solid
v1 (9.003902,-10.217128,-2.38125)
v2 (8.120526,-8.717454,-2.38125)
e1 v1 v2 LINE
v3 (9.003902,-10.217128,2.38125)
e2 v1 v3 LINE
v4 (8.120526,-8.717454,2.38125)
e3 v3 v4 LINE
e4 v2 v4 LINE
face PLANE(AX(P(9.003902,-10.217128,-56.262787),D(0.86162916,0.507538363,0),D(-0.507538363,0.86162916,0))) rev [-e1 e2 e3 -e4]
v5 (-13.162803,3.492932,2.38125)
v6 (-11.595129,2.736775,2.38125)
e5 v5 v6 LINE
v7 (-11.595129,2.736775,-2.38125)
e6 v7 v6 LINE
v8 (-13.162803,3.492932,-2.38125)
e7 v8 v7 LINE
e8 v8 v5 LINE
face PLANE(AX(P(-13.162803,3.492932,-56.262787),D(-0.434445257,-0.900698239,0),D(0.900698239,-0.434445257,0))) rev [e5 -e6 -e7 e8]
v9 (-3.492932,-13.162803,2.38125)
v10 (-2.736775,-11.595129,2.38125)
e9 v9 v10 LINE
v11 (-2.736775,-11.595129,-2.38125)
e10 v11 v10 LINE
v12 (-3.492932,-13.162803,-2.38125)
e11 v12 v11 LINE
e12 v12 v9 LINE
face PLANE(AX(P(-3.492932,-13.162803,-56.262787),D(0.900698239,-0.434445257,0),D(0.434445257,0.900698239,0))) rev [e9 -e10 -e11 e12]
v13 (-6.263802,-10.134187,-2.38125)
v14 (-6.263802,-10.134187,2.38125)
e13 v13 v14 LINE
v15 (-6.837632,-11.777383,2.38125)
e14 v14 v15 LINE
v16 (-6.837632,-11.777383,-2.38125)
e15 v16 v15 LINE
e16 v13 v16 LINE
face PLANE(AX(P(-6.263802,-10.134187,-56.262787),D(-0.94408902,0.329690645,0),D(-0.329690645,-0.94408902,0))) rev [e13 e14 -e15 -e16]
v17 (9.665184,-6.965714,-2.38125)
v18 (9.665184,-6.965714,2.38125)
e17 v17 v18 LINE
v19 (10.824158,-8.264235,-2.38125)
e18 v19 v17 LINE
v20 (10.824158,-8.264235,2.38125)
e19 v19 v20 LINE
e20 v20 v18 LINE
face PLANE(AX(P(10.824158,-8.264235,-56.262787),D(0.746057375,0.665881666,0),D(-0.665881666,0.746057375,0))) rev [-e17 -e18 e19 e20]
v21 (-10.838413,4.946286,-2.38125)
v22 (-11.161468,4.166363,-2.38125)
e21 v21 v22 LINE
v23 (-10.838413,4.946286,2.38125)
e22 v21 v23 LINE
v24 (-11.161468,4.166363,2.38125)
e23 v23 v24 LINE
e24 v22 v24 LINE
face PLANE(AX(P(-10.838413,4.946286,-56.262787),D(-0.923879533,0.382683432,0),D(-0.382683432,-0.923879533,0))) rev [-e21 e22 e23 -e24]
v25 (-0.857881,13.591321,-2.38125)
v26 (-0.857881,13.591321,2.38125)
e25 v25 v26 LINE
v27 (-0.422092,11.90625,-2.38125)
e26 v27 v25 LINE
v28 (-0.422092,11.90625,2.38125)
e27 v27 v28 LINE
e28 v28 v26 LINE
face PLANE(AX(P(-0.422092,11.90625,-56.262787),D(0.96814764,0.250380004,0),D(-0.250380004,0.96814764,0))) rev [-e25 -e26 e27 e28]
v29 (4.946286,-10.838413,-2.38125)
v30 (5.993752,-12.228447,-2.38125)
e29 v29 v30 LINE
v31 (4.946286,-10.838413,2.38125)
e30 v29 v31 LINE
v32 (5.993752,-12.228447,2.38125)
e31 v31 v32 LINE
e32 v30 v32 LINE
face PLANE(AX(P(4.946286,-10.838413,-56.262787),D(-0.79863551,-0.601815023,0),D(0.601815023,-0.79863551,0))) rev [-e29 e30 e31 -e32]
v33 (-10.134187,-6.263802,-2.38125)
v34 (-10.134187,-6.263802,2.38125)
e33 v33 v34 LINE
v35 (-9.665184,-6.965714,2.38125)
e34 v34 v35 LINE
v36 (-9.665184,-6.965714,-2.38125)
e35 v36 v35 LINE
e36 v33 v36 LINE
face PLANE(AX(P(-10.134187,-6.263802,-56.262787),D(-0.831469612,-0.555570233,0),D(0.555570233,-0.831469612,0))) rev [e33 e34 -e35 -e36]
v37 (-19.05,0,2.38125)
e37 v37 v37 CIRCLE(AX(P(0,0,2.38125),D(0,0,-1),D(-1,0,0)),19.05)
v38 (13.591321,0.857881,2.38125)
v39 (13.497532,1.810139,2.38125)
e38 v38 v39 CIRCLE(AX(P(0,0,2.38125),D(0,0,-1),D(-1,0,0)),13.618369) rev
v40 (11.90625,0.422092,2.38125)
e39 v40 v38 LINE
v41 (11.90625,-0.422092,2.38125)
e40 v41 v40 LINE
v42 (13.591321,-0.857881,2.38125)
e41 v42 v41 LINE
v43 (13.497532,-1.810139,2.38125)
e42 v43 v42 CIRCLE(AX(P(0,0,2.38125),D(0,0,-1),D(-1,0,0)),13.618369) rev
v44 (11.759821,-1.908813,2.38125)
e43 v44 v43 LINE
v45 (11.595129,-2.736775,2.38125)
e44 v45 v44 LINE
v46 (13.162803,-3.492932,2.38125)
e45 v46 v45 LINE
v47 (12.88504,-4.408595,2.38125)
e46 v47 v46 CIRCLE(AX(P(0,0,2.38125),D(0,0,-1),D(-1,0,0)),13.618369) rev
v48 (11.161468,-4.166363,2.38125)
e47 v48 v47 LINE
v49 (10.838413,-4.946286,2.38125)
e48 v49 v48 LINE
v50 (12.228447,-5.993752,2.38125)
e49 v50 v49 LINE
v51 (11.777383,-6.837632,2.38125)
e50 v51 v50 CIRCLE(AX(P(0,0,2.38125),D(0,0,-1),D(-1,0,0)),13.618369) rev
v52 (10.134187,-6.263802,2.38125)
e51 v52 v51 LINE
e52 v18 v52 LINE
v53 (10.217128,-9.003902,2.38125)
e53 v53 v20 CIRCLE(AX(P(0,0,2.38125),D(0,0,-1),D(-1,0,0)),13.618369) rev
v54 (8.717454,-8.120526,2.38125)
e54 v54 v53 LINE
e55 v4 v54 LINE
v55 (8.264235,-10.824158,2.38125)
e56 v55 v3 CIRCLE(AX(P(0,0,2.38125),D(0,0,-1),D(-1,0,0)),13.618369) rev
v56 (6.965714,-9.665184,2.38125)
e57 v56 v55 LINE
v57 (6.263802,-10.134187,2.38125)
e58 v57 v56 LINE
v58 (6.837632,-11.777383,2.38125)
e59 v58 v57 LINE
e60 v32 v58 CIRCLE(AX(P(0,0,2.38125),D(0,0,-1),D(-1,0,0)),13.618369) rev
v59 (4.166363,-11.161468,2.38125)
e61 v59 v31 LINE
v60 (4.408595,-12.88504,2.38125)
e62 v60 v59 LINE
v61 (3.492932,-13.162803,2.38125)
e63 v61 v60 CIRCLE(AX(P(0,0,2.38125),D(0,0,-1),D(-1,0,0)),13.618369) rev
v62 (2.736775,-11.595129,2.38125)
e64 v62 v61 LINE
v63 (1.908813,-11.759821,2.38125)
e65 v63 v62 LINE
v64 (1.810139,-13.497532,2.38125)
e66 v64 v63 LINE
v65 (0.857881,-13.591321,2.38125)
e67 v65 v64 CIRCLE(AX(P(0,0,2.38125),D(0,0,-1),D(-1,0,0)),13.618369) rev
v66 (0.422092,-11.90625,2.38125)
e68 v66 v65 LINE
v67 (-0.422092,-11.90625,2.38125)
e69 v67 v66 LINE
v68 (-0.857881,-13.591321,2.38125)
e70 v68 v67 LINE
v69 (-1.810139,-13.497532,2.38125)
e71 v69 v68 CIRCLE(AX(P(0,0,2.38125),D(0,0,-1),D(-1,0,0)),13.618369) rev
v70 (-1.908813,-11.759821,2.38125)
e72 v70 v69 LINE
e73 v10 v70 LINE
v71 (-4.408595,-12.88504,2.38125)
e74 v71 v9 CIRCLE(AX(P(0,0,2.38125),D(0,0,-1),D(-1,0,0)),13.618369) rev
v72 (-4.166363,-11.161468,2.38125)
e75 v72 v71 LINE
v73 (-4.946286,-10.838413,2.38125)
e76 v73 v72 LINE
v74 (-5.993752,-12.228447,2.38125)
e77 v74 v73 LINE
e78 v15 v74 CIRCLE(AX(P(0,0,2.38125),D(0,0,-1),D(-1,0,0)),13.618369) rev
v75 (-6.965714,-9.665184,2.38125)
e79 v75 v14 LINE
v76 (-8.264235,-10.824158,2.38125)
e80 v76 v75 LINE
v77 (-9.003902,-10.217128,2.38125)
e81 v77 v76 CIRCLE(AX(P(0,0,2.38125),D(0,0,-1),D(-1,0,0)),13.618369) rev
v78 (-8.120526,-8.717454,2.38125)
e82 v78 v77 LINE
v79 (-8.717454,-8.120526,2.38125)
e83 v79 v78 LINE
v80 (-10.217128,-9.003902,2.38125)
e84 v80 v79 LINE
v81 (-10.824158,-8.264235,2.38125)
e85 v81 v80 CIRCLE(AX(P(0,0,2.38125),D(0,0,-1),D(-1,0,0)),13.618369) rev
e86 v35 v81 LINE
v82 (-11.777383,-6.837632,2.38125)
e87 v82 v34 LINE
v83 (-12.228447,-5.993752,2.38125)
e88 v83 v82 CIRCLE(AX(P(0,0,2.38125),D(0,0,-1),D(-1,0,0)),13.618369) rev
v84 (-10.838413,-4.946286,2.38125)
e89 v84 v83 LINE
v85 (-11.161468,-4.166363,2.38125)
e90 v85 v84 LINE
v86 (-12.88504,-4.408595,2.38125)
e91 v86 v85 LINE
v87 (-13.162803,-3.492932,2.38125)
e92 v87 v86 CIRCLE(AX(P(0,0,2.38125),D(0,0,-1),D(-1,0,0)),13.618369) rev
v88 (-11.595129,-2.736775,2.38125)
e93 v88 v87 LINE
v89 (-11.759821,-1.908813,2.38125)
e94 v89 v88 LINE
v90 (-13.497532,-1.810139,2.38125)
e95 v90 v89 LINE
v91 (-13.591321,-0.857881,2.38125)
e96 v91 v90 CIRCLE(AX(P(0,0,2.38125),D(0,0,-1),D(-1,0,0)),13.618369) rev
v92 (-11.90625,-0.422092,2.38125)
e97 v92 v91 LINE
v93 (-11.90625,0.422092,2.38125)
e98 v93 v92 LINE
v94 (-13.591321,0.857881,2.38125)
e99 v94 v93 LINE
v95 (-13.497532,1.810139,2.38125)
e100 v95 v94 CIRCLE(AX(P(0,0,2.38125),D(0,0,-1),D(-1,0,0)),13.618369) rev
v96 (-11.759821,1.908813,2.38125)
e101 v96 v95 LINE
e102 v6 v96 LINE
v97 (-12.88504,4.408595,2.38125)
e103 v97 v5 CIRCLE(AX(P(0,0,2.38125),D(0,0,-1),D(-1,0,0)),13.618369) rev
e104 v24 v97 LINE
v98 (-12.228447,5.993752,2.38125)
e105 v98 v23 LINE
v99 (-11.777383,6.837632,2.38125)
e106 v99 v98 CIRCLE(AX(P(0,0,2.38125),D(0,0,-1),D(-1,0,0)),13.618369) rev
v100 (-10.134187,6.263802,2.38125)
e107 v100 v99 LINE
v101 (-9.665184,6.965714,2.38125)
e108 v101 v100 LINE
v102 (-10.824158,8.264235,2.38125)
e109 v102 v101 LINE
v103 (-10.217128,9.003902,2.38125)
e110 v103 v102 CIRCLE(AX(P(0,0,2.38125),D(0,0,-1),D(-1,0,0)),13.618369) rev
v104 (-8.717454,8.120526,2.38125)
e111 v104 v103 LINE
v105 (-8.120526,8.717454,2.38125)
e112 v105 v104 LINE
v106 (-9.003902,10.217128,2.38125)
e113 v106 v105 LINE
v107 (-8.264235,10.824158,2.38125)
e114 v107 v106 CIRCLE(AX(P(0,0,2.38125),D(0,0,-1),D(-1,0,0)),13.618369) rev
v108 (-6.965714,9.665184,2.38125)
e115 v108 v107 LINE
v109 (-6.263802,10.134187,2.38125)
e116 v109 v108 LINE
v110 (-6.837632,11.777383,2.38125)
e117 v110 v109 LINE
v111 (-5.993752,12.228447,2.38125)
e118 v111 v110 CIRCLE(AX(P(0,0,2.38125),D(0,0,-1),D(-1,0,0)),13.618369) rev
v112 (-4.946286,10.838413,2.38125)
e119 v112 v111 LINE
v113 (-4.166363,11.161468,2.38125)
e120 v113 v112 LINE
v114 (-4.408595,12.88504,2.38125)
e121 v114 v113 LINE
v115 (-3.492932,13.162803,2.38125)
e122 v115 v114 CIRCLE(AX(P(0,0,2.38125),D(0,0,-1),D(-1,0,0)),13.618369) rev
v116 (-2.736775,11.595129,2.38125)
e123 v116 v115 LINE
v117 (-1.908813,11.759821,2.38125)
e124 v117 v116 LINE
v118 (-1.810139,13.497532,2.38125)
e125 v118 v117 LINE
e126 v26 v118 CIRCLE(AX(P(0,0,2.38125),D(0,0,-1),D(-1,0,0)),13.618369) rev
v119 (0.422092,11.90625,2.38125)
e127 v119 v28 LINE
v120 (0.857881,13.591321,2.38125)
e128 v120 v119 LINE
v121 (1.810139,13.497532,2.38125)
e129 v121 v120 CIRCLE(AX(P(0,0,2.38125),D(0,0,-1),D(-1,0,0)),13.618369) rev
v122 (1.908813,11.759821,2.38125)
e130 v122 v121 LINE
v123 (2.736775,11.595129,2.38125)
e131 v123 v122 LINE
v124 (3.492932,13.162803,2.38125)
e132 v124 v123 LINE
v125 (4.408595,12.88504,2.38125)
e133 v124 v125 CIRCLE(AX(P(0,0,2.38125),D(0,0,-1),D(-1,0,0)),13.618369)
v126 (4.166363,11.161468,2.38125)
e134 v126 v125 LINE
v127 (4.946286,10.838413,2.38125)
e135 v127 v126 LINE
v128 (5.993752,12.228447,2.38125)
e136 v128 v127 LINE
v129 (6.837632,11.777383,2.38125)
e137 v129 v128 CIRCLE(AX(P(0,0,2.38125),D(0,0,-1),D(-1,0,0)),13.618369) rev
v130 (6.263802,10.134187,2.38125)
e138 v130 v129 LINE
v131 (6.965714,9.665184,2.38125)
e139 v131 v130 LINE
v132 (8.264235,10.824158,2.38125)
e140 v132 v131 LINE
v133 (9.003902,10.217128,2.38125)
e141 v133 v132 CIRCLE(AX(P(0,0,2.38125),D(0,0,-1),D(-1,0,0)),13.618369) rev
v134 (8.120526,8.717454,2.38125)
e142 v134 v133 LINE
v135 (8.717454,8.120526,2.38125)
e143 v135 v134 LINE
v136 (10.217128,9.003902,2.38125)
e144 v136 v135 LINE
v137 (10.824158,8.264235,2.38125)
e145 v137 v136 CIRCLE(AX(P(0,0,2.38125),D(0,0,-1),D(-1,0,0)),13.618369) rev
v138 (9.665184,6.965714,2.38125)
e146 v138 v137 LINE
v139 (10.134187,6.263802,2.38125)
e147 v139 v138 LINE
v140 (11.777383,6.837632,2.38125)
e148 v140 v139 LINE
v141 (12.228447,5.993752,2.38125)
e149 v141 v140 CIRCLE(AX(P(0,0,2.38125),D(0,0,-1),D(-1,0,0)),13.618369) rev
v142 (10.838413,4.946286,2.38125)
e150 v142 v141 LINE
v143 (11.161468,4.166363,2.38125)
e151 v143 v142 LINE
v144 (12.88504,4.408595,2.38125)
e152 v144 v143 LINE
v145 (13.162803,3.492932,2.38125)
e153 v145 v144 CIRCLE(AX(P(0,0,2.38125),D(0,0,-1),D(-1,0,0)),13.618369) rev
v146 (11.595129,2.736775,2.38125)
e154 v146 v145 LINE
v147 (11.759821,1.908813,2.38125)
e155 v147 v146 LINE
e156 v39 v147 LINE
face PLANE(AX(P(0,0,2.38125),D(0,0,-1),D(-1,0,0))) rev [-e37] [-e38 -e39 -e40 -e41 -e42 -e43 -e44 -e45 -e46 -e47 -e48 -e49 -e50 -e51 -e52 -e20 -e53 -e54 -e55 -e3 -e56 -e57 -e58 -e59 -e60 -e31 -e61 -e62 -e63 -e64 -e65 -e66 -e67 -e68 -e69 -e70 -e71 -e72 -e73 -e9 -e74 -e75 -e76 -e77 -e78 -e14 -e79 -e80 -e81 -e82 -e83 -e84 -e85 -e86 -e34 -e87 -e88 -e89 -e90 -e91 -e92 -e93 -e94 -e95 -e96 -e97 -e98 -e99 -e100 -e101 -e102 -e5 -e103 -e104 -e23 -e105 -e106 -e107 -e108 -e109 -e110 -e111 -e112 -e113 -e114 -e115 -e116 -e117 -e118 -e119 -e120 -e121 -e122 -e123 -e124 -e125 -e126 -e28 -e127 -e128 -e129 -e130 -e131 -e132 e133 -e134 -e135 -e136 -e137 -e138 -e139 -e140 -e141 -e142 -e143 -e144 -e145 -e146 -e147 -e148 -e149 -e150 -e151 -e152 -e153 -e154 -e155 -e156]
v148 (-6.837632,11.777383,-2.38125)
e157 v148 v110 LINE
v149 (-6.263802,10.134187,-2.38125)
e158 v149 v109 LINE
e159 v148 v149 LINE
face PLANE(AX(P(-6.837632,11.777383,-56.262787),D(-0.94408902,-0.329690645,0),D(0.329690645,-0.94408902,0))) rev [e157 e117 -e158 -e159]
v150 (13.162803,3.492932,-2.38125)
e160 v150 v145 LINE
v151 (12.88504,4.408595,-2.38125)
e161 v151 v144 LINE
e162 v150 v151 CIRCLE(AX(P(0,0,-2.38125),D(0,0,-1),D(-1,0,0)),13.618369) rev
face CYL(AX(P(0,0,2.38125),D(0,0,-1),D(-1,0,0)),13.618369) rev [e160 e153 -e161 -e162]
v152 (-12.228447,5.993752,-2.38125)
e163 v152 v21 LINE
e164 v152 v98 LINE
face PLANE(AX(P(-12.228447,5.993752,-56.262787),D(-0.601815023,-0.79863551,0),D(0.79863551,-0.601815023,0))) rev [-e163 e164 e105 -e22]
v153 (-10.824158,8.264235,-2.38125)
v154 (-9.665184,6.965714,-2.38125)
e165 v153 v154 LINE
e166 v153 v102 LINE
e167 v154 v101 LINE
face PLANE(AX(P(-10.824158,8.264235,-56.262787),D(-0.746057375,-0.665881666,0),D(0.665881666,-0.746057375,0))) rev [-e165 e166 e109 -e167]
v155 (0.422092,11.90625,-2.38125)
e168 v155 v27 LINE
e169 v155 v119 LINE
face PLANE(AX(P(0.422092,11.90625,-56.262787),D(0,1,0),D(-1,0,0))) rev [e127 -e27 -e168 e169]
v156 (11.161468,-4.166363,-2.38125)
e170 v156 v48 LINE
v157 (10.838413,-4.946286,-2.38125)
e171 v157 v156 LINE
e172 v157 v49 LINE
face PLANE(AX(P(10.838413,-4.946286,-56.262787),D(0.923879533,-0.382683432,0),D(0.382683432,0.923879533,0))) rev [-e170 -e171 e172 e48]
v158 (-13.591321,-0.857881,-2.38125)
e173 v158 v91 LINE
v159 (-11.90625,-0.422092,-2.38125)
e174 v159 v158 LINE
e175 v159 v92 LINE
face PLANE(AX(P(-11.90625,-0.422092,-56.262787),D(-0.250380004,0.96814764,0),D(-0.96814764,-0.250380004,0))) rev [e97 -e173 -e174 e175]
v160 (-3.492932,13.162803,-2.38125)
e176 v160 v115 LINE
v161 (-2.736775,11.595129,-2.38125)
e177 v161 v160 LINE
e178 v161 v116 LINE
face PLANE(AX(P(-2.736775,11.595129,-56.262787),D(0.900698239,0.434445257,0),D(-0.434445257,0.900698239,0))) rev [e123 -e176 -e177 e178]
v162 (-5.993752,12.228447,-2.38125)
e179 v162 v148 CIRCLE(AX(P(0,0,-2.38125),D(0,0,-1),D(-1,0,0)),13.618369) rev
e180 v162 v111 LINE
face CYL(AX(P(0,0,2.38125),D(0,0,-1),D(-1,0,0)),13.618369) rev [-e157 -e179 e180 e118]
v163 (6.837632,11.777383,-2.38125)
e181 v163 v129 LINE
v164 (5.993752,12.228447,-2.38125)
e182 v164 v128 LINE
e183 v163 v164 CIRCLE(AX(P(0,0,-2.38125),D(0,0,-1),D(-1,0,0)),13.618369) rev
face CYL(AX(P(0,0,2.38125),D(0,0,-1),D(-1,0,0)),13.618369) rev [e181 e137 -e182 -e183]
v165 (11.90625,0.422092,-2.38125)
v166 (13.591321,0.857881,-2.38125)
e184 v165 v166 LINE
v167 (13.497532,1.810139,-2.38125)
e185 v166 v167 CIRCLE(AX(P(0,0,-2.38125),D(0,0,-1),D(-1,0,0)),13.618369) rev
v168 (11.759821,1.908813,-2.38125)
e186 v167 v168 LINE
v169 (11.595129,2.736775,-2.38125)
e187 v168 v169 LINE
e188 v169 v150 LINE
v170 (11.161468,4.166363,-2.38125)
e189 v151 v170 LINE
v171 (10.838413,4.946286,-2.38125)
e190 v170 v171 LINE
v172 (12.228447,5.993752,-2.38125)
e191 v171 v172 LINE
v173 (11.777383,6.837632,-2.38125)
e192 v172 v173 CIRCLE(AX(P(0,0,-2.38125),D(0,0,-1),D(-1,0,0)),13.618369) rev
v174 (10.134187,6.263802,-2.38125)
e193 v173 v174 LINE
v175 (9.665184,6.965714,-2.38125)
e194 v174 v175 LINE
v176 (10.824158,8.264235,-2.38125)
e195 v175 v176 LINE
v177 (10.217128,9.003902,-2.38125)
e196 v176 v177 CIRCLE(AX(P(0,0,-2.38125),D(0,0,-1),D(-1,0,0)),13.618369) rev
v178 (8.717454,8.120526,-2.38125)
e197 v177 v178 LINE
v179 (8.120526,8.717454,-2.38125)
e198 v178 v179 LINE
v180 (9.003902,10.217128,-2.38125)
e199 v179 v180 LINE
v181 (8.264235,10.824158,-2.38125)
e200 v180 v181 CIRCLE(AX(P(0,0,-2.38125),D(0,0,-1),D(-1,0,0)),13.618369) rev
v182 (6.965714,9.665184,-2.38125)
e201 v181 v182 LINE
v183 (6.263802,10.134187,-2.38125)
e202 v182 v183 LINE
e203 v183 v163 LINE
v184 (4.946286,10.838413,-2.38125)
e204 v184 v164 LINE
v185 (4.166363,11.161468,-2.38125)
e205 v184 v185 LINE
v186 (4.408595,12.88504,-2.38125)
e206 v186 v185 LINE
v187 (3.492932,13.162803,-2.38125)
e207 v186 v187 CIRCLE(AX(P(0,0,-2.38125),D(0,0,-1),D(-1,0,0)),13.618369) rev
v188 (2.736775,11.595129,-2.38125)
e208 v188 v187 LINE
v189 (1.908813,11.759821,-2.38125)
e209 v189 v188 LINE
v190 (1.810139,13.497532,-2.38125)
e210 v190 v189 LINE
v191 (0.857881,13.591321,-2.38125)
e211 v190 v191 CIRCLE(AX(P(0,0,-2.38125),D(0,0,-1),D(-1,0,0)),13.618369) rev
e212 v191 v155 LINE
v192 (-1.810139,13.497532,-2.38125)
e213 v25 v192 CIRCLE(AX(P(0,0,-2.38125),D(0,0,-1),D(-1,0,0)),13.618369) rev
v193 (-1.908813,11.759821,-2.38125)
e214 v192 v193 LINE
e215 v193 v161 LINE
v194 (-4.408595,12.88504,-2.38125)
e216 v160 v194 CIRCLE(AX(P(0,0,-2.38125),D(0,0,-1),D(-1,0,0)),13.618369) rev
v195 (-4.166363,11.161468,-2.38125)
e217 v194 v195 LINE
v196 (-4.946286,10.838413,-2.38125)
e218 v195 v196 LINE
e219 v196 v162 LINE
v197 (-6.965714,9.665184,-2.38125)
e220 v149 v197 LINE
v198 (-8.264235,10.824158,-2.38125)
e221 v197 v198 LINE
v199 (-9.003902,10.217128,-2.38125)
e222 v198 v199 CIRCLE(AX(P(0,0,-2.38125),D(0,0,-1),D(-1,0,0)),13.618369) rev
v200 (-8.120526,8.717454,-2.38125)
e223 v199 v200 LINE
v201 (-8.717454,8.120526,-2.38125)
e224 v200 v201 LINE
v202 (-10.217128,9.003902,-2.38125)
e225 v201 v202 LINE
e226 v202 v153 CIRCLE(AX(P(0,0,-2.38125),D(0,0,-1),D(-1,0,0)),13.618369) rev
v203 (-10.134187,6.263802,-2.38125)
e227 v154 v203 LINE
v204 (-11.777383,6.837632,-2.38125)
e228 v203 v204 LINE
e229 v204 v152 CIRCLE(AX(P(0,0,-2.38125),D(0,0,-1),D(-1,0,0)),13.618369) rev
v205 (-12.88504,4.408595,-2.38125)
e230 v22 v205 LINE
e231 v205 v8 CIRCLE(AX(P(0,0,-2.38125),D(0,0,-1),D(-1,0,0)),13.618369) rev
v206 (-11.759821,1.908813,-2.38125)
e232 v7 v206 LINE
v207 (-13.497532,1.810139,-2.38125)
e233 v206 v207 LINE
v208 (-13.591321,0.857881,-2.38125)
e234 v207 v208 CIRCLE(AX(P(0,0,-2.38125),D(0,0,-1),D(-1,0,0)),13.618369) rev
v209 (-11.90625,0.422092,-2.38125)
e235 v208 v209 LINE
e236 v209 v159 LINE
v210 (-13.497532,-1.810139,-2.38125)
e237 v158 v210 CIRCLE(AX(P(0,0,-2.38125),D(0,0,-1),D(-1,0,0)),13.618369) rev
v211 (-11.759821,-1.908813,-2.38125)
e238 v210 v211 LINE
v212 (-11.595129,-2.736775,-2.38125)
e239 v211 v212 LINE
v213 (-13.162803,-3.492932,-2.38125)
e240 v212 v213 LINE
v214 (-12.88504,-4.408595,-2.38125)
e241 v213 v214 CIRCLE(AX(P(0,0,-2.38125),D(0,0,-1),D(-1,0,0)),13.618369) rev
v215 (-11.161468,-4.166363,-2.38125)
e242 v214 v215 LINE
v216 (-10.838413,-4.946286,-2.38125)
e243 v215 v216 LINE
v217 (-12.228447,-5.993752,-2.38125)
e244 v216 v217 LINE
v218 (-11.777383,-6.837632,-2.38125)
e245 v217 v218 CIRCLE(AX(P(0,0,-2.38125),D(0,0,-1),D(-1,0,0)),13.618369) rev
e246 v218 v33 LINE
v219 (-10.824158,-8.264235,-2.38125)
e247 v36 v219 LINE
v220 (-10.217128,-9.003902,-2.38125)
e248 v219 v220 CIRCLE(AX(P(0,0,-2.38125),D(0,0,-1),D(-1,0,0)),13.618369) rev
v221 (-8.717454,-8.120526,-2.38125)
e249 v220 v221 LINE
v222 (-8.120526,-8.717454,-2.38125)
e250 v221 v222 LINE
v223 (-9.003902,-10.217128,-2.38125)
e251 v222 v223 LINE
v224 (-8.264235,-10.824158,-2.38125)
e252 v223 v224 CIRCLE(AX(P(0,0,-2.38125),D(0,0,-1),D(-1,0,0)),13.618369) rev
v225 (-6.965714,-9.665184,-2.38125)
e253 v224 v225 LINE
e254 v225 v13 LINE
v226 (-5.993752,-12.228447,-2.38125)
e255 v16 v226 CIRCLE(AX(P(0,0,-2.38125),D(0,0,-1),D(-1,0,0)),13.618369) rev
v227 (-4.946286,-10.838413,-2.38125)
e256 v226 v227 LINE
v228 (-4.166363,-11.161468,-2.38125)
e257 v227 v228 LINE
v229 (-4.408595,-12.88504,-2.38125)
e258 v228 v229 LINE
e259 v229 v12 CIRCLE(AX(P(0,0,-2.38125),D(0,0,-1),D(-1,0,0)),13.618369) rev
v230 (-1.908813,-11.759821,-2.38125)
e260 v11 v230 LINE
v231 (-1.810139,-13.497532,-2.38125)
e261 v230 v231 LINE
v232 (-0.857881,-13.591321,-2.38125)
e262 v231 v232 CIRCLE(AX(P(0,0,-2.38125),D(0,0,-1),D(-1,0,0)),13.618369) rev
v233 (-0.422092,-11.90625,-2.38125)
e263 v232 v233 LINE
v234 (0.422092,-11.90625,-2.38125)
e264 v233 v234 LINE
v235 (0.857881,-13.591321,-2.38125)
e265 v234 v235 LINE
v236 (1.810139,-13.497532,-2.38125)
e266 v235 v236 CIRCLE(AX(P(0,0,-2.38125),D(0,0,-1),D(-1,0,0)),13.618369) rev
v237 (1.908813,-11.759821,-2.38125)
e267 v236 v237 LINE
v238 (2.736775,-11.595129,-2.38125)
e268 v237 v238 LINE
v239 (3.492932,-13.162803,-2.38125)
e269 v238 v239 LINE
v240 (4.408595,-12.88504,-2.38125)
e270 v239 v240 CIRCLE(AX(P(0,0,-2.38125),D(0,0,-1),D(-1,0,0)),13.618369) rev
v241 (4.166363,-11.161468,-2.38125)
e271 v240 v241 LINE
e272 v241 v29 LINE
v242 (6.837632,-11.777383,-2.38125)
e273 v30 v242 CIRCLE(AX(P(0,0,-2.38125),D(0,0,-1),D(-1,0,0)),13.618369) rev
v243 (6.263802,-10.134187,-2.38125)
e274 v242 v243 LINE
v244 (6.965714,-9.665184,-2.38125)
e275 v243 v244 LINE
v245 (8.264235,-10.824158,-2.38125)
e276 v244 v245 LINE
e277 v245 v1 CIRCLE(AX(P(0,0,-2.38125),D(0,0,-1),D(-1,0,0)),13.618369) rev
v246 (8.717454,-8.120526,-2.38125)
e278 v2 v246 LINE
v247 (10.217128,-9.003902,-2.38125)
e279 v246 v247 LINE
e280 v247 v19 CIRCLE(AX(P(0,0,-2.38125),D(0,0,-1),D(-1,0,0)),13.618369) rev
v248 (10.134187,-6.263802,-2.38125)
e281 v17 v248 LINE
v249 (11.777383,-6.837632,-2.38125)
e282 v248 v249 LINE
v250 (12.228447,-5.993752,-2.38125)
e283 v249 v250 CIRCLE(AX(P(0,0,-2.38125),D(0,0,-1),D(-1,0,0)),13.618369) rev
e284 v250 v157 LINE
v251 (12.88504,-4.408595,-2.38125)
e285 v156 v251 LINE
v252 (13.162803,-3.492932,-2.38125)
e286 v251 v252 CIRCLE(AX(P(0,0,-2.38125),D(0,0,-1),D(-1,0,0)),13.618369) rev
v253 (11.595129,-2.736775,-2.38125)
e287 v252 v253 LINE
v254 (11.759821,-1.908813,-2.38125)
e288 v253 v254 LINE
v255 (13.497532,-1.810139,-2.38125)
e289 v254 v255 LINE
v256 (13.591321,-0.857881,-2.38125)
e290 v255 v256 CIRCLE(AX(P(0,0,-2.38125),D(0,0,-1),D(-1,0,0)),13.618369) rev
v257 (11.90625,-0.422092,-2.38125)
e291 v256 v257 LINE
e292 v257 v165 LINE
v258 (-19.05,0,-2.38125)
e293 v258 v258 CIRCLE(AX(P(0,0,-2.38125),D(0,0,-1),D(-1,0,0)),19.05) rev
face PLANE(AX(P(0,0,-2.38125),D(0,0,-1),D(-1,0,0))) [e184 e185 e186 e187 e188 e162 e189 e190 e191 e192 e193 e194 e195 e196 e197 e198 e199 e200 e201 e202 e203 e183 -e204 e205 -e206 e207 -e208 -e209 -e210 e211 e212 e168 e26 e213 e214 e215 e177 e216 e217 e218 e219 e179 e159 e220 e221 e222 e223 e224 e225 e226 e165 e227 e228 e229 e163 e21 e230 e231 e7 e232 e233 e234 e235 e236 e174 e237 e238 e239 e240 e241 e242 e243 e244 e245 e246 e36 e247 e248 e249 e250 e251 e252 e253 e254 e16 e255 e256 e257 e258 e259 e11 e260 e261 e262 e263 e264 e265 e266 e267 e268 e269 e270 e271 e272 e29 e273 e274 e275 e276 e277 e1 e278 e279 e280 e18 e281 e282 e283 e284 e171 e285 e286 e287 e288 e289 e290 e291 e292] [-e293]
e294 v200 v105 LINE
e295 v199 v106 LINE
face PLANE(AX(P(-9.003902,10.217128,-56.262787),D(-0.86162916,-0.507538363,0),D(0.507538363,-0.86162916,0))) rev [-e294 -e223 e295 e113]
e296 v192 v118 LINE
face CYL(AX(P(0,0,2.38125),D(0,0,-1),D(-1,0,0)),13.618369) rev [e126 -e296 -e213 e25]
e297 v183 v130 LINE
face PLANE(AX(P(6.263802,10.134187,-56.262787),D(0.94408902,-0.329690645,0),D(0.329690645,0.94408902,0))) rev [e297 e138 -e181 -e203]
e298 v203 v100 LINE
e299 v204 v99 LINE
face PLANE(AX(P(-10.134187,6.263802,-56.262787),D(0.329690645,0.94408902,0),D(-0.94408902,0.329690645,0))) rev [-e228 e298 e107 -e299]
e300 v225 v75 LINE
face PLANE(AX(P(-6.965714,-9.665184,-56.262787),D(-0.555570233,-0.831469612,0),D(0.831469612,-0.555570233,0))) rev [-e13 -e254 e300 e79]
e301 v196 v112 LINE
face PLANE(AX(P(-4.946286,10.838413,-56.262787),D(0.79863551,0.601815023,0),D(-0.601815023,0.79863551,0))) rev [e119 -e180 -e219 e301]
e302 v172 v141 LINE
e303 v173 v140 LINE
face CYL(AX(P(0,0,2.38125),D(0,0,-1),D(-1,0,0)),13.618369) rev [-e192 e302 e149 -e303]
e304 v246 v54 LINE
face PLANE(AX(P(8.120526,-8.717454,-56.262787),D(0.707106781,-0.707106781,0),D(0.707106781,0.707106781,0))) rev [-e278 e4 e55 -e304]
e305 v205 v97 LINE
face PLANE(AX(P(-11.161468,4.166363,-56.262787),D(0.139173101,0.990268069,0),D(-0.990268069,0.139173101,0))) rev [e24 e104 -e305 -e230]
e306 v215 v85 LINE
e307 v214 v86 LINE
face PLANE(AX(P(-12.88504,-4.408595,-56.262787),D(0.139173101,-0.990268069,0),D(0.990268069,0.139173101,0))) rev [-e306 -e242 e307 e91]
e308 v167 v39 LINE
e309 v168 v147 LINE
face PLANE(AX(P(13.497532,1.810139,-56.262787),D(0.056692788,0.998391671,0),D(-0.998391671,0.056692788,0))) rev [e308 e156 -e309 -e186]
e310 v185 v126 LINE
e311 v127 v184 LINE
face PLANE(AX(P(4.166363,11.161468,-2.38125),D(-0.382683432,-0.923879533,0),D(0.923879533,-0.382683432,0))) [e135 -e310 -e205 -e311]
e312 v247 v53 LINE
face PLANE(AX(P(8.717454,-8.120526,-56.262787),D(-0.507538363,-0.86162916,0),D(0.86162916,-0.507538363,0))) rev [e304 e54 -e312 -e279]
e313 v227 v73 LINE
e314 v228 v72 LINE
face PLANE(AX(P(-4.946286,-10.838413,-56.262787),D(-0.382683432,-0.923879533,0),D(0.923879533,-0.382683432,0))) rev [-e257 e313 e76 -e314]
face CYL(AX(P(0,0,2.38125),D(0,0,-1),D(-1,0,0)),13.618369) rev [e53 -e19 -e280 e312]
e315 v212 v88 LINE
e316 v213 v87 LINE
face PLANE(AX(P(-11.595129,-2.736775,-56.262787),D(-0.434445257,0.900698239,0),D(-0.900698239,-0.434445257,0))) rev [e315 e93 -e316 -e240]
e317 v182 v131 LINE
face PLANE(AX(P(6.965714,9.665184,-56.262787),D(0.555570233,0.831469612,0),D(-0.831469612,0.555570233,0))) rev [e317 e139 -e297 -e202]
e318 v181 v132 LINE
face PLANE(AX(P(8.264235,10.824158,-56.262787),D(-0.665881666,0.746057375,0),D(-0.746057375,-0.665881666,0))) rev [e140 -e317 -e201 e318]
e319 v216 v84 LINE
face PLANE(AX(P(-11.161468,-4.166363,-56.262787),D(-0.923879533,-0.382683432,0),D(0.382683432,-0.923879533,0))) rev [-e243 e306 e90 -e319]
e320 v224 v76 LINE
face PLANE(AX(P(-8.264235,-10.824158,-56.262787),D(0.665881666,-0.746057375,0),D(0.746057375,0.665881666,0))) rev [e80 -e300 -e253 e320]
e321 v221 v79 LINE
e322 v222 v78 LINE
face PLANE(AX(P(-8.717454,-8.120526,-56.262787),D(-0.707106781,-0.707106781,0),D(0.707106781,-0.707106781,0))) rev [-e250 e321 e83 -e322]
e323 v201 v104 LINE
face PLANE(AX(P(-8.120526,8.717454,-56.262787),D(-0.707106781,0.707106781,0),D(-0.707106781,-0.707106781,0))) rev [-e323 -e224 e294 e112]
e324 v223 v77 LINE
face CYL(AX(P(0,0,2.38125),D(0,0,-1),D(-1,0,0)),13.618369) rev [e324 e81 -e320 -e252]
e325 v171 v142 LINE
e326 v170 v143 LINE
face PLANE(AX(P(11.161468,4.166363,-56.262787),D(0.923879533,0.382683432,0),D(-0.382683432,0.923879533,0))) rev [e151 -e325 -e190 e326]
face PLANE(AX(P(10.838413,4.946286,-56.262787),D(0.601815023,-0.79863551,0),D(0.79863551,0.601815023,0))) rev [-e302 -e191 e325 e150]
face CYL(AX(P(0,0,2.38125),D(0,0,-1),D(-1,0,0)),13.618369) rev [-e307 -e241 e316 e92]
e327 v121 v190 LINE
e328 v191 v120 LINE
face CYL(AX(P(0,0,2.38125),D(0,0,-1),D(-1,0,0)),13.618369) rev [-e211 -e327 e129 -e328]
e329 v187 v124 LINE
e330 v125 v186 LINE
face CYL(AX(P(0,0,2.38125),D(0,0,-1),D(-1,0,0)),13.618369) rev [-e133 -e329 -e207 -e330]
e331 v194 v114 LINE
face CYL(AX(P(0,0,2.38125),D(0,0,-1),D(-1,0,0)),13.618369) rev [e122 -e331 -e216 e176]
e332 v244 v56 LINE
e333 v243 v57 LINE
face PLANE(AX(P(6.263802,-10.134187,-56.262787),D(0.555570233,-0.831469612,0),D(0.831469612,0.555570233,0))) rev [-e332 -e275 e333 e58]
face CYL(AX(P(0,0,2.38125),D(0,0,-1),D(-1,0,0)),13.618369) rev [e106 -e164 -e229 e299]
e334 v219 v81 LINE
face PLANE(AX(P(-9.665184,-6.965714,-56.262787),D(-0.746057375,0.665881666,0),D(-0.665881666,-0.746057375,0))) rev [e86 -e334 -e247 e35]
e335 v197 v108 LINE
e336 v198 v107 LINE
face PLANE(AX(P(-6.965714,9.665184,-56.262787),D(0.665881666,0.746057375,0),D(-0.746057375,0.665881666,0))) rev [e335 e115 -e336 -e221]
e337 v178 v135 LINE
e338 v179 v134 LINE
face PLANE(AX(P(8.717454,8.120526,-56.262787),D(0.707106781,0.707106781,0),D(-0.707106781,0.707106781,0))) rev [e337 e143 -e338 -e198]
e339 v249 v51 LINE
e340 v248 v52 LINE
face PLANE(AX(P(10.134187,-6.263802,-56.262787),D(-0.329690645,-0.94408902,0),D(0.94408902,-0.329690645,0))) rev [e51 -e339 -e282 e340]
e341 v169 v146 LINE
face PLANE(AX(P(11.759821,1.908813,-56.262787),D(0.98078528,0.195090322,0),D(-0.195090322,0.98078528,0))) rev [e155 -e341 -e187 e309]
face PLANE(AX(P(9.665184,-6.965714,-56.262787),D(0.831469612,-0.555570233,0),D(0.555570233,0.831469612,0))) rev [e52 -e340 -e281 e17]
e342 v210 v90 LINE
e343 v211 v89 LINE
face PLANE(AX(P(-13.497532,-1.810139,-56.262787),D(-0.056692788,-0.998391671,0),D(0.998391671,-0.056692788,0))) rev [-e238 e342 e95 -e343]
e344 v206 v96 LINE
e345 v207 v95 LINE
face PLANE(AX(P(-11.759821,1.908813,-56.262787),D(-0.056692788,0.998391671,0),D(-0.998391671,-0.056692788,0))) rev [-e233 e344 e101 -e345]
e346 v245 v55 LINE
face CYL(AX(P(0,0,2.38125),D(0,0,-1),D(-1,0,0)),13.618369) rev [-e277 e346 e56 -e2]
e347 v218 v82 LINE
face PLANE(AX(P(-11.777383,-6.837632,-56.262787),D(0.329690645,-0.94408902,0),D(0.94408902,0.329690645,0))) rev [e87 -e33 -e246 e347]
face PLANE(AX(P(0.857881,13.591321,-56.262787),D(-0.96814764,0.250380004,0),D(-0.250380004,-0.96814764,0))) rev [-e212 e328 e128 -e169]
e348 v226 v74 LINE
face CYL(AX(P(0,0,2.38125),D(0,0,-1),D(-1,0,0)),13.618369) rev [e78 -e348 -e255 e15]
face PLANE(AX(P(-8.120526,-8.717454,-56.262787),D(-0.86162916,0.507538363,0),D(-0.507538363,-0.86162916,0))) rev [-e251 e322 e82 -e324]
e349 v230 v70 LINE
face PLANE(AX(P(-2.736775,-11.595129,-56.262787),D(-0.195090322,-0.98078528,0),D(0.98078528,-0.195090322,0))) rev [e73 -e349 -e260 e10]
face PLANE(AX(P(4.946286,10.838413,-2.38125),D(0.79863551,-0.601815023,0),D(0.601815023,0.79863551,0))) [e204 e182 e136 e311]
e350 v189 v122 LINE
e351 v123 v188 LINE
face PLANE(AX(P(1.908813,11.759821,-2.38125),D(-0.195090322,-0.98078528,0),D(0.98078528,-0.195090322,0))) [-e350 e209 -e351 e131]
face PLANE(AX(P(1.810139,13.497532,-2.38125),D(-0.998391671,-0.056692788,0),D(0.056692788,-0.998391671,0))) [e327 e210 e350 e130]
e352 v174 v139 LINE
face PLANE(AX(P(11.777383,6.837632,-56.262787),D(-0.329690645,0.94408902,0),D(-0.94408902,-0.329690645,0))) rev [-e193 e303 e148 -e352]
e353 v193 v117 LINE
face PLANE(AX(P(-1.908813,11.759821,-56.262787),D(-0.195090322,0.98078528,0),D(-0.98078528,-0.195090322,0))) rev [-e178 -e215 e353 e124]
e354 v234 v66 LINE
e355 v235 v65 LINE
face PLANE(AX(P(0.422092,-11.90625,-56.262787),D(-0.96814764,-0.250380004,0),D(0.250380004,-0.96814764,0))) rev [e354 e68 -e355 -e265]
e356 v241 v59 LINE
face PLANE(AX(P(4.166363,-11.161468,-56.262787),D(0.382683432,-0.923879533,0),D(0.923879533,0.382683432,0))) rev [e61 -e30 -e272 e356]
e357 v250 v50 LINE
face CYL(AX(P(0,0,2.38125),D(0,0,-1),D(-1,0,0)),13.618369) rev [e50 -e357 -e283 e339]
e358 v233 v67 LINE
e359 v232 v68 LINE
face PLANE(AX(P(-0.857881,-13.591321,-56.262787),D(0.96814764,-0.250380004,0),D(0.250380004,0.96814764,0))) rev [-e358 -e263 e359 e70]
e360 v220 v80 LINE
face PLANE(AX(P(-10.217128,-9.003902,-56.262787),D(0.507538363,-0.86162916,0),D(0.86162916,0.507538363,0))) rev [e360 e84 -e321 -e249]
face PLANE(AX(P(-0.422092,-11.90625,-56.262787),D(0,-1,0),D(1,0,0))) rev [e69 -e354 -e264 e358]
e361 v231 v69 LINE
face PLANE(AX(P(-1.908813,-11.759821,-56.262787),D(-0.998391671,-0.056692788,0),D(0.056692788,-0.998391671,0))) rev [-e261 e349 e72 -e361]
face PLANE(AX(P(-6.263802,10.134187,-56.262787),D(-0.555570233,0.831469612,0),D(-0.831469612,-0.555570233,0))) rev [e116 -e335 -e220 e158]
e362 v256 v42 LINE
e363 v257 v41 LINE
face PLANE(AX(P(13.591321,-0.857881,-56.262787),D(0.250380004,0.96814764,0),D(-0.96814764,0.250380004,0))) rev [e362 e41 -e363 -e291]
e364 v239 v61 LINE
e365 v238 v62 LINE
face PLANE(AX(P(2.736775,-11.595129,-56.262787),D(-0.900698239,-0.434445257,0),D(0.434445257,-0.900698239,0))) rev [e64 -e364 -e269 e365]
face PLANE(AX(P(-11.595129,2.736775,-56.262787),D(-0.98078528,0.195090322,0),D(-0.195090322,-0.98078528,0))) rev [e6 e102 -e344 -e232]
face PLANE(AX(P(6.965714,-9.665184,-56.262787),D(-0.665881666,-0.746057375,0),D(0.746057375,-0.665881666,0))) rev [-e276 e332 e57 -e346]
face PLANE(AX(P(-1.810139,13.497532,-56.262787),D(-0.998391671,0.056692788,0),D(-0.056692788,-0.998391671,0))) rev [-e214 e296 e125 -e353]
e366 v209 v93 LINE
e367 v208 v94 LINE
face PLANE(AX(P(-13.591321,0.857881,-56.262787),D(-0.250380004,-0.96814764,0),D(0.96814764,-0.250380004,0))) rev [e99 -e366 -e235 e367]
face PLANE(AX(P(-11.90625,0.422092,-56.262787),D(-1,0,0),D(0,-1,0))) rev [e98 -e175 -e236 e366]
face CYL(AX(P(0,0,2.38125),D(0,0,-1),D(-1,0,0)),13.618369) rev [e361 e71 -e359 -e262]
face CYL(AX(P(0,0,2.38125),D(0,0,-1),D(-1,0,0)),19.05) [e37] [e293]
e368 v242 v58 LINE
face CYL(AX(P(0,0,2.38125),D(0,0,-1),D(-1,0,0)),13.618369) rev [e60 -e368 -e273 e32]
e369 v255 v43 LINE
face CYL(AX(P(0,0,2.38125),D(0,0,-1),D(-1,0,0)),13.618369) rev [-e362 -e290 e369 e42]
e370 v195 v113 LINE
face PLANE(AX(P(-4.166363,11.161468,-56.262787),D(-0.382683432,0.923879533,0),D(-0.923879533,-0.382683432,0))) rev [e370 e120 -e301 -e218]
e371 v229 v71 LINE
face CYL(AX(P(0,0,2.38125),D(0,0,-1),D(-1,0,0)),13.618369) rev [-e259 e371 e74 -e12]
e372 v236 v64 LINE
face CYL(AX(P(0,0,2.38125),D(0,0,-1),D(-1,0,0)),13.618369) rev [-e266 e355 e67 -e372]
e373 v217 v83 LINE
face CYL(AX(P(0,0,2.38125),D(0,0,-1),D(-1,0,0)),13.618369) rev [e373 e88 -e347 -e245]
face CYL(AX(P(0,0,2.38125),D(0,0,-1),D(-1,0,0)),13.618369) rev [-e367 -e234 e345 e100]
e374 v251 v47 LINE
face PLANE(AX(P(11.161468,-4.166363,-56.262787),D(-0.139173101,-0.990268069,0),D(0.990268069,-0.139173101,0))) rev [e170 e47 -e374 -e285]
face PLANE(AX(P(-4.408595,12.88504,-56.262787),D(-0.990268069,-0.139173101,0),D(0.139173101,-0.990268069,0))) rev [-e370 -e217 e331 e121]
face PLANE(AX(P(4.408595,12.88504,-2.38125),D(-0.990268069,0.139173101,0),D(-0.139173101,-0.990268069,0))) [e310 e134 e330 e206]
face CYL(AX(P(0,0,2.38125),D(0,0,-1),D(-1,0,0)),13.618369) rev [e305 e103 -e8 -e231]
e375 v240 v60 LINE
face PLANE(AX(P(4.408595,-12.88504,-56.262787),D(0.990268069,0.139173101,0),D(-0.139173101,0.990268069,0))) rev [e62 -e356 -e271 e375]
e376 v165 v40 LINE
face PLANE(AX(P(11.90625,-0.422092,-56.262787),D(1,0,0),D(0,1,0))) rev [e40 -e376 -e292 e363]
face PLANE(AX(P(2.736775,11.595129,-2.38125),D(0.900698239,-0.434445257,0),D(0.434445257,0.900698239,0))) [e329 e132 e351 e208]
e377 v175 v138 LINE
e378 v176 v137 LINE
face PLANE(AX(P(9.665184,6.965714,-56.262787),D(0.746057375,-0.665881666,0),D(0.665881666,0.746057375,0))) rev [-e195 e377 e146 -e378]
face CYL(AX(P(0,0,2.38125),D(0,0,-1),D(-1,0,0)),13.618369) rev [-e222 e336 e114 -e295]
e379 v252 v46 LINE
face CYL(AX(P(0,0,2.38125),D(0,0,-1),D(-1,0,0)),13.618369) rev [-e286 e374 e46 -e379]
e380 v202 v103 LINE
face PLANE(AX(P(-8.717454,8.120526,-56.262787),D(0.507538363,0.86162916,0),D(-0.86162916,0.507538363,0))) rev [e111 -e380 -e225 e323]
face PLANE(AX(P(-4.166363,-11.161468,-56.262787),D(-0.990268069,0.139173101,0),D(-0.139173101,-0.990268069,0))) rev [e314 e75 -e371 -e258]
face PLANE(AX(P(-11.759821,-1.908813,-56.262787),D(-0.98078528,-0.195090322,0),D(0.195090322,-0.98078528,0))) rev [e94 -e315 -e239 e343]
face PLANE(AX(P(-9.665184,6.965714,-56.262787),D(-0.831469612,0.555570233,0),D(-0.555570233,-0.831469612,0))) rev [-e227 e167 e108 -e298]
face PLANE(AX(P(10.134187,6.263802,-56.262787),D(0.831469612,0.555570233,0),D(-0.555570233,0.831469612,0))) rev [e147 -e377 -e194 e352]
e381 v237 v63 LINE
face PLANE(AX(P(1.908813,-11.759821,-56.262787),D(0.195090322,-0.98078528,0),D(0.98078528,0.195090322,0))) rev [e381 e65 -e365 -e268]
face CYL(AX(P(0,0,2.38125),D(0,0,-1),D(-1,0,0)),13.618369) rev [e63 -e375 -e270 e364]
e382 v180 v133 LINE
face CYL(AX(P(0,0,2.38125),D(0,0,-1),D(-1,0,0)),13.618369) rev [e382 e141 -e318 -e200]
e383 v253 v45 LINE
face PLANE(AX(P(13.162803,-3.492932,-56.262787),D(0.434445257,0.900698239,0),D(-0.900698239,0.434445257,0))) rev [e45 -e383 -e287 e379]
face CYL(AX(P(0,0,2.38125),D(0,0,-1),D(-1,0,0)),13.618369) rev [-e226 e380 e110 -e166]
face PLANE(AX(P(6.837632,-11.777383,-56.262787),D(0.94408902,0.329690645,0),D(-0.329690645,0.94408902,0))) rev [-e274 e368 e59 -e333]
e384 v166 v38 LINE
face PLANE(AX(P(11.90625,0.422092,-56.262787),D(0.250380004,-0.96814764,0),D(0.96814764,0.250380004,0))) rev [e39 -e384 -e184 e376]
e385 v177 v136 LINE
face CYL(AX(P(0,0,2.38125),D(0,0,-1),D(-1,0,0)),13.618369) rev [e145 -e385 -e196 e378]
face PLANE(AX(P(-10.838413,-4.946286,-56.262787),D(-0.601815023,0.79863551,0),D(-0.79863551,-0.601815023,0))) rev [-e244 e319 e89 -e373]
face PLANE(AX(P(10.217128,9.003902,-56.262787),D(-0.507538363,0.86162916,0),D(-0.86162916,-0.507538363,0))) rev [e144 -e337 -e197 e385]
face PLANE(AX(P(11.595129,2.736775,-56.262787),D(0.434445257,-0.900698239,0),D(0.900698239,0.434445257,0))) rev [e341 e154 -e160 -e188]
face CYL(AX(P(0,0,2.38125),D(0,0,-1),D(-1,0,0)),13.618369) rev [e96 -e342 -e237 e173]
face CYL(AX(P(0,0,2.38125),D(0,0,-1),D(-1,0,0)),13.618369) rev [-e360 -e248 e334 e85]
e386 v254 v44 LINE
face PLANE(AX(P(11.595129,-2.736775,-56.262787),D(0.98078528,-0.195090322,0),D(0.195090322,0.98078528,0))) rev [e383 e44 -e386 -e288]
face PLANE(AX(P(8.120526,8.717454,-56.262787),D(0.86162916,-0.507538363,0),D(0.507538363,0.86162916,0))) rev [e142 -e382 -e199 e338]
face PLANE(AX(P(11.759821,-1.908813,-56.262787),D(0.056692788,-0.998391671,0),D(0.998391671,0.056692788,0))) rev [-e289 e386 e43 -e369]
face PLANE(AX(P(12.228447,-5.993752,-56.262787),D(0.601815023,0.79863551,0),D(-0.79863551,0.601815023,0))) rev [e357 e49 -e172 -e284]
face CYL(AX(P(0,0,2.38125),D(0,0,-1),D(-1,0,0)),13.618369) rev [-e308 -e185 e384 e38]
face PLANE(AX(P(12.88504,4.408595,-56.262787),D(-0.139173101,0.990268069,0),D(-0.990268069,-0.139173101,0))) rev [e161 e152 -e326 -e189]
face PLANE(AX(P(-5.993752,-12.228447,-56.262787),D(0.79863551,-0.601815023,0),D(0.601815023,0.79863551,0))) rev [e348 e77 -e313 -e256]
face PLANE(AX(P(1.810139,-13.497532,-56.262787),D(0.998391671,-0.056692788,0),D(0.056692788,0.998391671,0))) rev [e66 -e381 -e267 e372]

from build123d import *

# Parameters (mm, degrees)
SKETCH1_R           = 19.05
BOSS_EXTRUDE1_DEPTH = 4.7625


# Read off the part's stored shape, not the designer's step: Imported1
with BuildPart() as part:
    # Sketch1 → Boss-Extrude1 (new body)
    with BuildSketch(Plane.XY.offset(2.38125)):
        with Locations(Location((0, 0, 0), (0, 0, 180))):
            Circle(SKETCH1_R)
        with BuildLine():
            Line((1.908812995, 11.759820716), (1.810138608, 13.497531825))
            ThreePointArc((1.810138608, 13.497531825), (1.334833561, 13.552792572), (0.857880531, 13.591321069))
            Line((0.857880531, 13.591321069), (0.422091522, 11.90625))
            Line((0.422091522, 11.90625), (-0.422091522, 11.90625))
            Line((-0.422091522, 11.90625), (-0.857880531, 13.591321069))
            ThreePointArc((-0.857880531, 13.591321069), (-1.334833561, 13.552792582), (-1.810138607, 13.497531835))
            Line((-1.810138607, 13.497531835), (-1.908812995, 11.759820716))
            Line((-1.908812995, 11.759820716), (-2.736775298, 11.595128774))
            Line((-2.736775298, 11.595128774), (-3.492931801, 13.162803457))
            ThreePointArc((-3.492931801, 13.162803457), (-3.953203777, 13.031966364), (-4.408595133, 12.885040022))
            Line((-4.408595133, 12.885040022), (-4.166362899, 11.161468116))
            Line((-4.166362899, 11.161468116), (-4.946286334, 10.838413252))
            Line((-4.946286334, 10.838413252), (-5.993751661, 12.228446689))
            ThreePointArc((-5.993751661, 12.228446689), (-6.41965459, 12.010328986), (-6.837631821, 11.777383347))
            Line((-6.837631821, 11.777383347), (-6.263801813, 10.134186556))
            Line((-6.263801813, 10.134186556), (-6.965714361, 9.665183587))
            Line((-6.965714361, 9.665183587), (-8.264235006, 10.824157574))
            ThreePointArc((-8.264235006, 10.824157574), (-8.639401676, 10.527141401), (-9.003902152, 10.217128434))
            Line((-9.003902152, 10.217128434), (-8.120526336, 8.717453891))
            Line((-8.120526336, 8.717453891), (-8.717453891, 8.120526336))
            Line((-8.717453891, 8.120526336), (-10.217128434, 9.003902152))
            ThreePointArc((-10.217128434, 9.003902152), (-10.527141401, 8.639401676), (-10.824157574, 8.264235006))
            Line((-10.824157574, 8.264235006), (-9.665183587, 6.965714361))
            Line((-9.665183587, 6.965714361), (-10.134186556, 6.263801813))
            Line((-10.134186556, 6.263801813), (-11.777383347, 6.837631821))
            ThreePointArc((-11.777383347, 6.837631821), (-12.010328986, 6.41965459), (-12.228446689, 5.993751661))
            Line((-12.228446689, 5.993751661), (-10.838413252, 4.946286334))
            Line((-10.838413252, 4.946286334), (-11.161468116, 4.166362899))
            Line((-11.161468116, 4.166362899), (-12.885040022, 4.408595133))
            ThreePointArc((-12.885040022, 4.408595133), (-13.031966364, 3.953203777), (-13.162803457, 3.492931801))
            Line((-13.162803457, 3.492931801), (-11.595128774, 2.736775298))
            Line((-11.595128774, 2.736775298), (-11.759820716, 1.908812995))
            Line((-11.759820716, 1.908812995), (-13.497531835, 1.810138607))
            ThreePointArc((-13.497531835, 1.810138607), (-13.552792582, 1.334833561), (-13.591321069, 0.857880531))
            Line((-13.591321069, 0.857880531), (-11.90625, 0.422091522))
            Line((-11.90625, 0.422091522), (-11.90625, -0.422091522))
            Line((-11.90625, -0.422091522), (-13.591321069, -0.857880531))
            ThreePointArc((-13.591321069, -0.857880531), (-13.552792582, -1.334833561), (-13.497531835, -1.810138607))
            Line((-13.497531835, -1.810138607), (-11.759820716, -1.908812995))
            Line((-11.759820716, -1.908812995), (-11.595128774, -2.736775298))
            Line((-11.595128774, -2.736775298), (-13.162803457, -3.492931801))
            ThreePointArc((-13.162803457, -3.492931801), (-13.031966364, -3.953203777), (-12.885040022, -4.408595133))
            Line((-12.885040022, -4.408595133), (-11.161468116, -4.166362899))
            Line((-11.161468116, -4.166362899), (-10.838413252, -4.946286334))
            Line((-10.838413252, -4.946286334), (-12.228446689, -5.993751661))
            ThreePointArc((-12.228446689, -5.993751661), (-12.010328986, -6.41965459), (-11.777383347, -6.837631821))
            Line((-11.777383347, -6.837631821), (-10.134186556, -6.263801813))
            Line((-10.134186556, -6.263801813), (-9.665183587, -6.965714361))
            Line((-9.665183587, -6.965714361), (-10.824157574, -8.264235006))
            ThreePointArc((-10.824157574, -8.264235006), (-10.527141401, -8.639401676), (-10.217128434, -9.003902152))
            Line((-10.217128434, -9.003902152), (-8.717453891, -8.120526336))
            Line((-8.717453891, -8.120526336), (-8.120526336, -8.717453891))
            Line((-8.120526336, -8.717453891), (-9.003902152, -10.217128434))
            ThreePointArc((-9.003902152, -10.217128434), (-8.639401676, -10.527141401), (-8.264235006, -10.824157574))
            Line((-8.264235006, -10.824157574), (-6.965714361, -9.665183587))
            Line((-6.965714361, -9.665183587), (-6.263801813, -10.134186556))
            Line((-6.263801813, -10.134186556), (-6.837631821, -11.777383347))
            ThreePointArc((-6.837631821, -11.777383347), (-6.41965459, -12.010328986), (-5.993751661, -12.228446689))
            Line((-5.993751661, -12.228446689), (-4.946286334, -10.838413252))
            Line((-4.946286334, -10.838413252), (-4.166362899, -11.161468116))
            Line((-4.166362899, -11.161468116), (-4.408595133, -12.885040022))
            ThreePointArc((-4.408595133, -12.885040022), (-3.953203777, -13.031966364), (-3.492931801, -13.162803457))
            Line((-3.492931801, -13.162803457), (-2.736775298, -11.595128774))
            Line((-2.736775298, -11.595128774), (-1.908812995, -11.759820716))
            Line((-1.908812995, -11.759820716), (-1.810138607, -13.497531835))
            ThreePointArc((-1.810138607, -13.497531835), (-1.334833561, -13.552792582), (-0.857880531, -13.591321069))
            Line((-0.857880531, -13.591321069), (-0.422091522, -11.90625))
            Line((-0.422091522, -11.90625), (0.422091522, -11.90625))
            Line((0.422091522, -11.90625), (0.857880531, -13.591321069))
            ThreePointArc((0.857880531, -13.591321069), (1.334833561, -13.552792582), (1.810138607, -13.497531835))
            Line((1.810138607, -13.497531835), (1.908812995, -11.759820716))
            Line((1.908812995, -11.759820716), (2.736775298, -11.595128774))
            Line((2.736775298, -11.595128774), (3.492931801, -13.162803457))
            ThreePointArc((3.492931801, -13.162803457), (3.953203777, -13.031966364), (4.408595133, -12.885040022))
            Line((4.408595133, -12.885040022), (4.166362899, -11.161468116))
            Line((4.166362899, -11.161468116), (4.946286334, -10.838413252))
            Line((4.946286334, -10.838413252), (5.993751661, -12.228446689))
            ThreePointArc((5.993751661, -12.228446689), (6.41965459, -12.010328986), (6.837631821, -11.777383347))
            Line((6.837631821, -11.777383347), (6.263801813, -10.134186556))
            Line((6.263801813, -10.134186556), (6.965714361, -9.665183587))
            Line((6.965714361, -9.665183587), (8.264235006, -10.824157574))
            ThreePointArc((8.264235006, -10.824157574), (8.639401676, -10.527141401), (9.003902152, -10.217128434))
            Line((9.003902152, -10.217128434), (8.120526336, -8.717453891))
            Line((8.120526336, -8.717453891), (8.717453891, -8.120526336))
            Line((8.717453891, -8.120526336), (10.217128434, -9.003902152))
            ThreePointArc((10.217128434, -9.003902152), (10.527141401, -8.639401676), (10.824157574, -8.264235006))
            Line((10.824157574, -8.264235006), (9.665183587, -6.965714361))
            Line((9.665183587, -6.965714361), (10.134186556, -6.263801813))
            Line((10.134186556, -6.263801813), (11.777383347, -6.837631821))
            ThreePointArc((11.777383347, -6.837631821), (12.010328986, -6.41965459), (12.228446689, -5.993751661))
            Line((12.228446689, -5.993751661), (10.838413252, -4.946286334))
            Line((10.838413252, -4.946286334), (11.161468116, -4.166362899))
            Line((11.161468116, -4.166362899), (12.885040022, -4.408595133))
            ThreePointArc((12.885040022, -4.408595133), (13.031966364, -3.953203777), (13.162803457, -3.492931801))
            Line((13.162803457, -3.492931801), (11.595128774, -2.736775298))
            Line((11.595128774, -2.736775298), (11.759820716, -1.908812995))
            Line((11.759820716, -1.908812995), (13.497531835, -1.810138607))
            ThreePointArc((13.497531835, -1.810138607), (13.552792582, -1.334833561), (13.591321069, -0.857880531))
            Line((13.591321069, -0.857880531), (11.90625, -0.422091522))
            Line((11.90625, -0.422091522), (11.90625, 0.422091522))
            Line((11.90625, 0.422091522), (13.591321069, 0.857880531))
            ThreePointArc((13.591321069, 0.857880531), (13.552792582, 1.334833561), (13.497531835, 1.810138607))
            Line((13.497531835, 1.810138607), (11.759820716, 1.908812995))
            Line((11.759820716, 1.908812995), (11.595128774, 2.736775298))
            Line((11.595128774, 2.736775298), (13.162803457, 3.492931801))
            ThreePointArc((13.162803457, 3.492931801), (13.031966364, 3.953203777), (12.885040022, 4.408595133))
            Line((12.885040022, 4.408595133), (11.161468116, 4.166362899))
            Line((11.161468116, 4.166362899), (10.838413252, 4.946286334))
            Line((10.838413252, 4.946286334), (12.228446689, 5.993751661))
            ThreePointArc((12.228446689, 5.993751661), (12.010328986, 6.41965459), (11.777383347, 6.837631821))
            Line((11.777383347, 6.837631821), (10.134186556, 6.263801813))
            Line((10.134186556, 6.263801813), (9.665183587, 6.965714361))
            Line((9.665183587, 6.965714361), (10.824157574, 8.264235006))
            ThreePointArc((10.824157574, 8.264235006), (10.527141401, 8.639401676), (10.217128434, 9.003902152))
            Line((10.217128434, 9.003902152), (8.717453891, 8.120526336))
            Line((8.717453891, 8.120526336), (8.120526336, 8.717453891))
            Line((8.120526336, 8.717453891), (9.003902152, 10.217128434))
            ThreePointArc((9.003902152, 10.217128434), (8.639401676, 10.527141401), (8.264235006, 10.824157574))
            Line((8.264235006, 10.824157574), (6.965714361, 9.665183587))
            Line((6.965714361, 9.665183587), (6.263801813, 10.134186556))
            Line((6.263801813, 10.134186556), (6.837631821, 11.777383347))
            ThreePointArc((6.837631821, 11.777383347), (6.41965459, 12.010328986), (5.993751661, 12.228446689))
            Line((5.993751661, 12.228446689), (4.946286334, 10.838413252))
            Line((4.946286334, 10.838413252), (4.166362899, 11.161468116))
            Line((4.166362899, 11.161468116), (4.408595133, 12.885040022))
            ThreePointArc((4.408595133, 12.885040022), (3.953203777, 13.031966364), (3.492931801, 13.162803457))
            Line((3.492931801, 13.162803457), (2.736775298, 11.595128774))
            Line((2.736775298, 11.595128774), (1.908812995, 11.759820716))
        make_face(mode=Mode.SUBTRACT)
    extrude(amount=-BOSS_EXTRUDE1_DEPTH)


solid = part.part
